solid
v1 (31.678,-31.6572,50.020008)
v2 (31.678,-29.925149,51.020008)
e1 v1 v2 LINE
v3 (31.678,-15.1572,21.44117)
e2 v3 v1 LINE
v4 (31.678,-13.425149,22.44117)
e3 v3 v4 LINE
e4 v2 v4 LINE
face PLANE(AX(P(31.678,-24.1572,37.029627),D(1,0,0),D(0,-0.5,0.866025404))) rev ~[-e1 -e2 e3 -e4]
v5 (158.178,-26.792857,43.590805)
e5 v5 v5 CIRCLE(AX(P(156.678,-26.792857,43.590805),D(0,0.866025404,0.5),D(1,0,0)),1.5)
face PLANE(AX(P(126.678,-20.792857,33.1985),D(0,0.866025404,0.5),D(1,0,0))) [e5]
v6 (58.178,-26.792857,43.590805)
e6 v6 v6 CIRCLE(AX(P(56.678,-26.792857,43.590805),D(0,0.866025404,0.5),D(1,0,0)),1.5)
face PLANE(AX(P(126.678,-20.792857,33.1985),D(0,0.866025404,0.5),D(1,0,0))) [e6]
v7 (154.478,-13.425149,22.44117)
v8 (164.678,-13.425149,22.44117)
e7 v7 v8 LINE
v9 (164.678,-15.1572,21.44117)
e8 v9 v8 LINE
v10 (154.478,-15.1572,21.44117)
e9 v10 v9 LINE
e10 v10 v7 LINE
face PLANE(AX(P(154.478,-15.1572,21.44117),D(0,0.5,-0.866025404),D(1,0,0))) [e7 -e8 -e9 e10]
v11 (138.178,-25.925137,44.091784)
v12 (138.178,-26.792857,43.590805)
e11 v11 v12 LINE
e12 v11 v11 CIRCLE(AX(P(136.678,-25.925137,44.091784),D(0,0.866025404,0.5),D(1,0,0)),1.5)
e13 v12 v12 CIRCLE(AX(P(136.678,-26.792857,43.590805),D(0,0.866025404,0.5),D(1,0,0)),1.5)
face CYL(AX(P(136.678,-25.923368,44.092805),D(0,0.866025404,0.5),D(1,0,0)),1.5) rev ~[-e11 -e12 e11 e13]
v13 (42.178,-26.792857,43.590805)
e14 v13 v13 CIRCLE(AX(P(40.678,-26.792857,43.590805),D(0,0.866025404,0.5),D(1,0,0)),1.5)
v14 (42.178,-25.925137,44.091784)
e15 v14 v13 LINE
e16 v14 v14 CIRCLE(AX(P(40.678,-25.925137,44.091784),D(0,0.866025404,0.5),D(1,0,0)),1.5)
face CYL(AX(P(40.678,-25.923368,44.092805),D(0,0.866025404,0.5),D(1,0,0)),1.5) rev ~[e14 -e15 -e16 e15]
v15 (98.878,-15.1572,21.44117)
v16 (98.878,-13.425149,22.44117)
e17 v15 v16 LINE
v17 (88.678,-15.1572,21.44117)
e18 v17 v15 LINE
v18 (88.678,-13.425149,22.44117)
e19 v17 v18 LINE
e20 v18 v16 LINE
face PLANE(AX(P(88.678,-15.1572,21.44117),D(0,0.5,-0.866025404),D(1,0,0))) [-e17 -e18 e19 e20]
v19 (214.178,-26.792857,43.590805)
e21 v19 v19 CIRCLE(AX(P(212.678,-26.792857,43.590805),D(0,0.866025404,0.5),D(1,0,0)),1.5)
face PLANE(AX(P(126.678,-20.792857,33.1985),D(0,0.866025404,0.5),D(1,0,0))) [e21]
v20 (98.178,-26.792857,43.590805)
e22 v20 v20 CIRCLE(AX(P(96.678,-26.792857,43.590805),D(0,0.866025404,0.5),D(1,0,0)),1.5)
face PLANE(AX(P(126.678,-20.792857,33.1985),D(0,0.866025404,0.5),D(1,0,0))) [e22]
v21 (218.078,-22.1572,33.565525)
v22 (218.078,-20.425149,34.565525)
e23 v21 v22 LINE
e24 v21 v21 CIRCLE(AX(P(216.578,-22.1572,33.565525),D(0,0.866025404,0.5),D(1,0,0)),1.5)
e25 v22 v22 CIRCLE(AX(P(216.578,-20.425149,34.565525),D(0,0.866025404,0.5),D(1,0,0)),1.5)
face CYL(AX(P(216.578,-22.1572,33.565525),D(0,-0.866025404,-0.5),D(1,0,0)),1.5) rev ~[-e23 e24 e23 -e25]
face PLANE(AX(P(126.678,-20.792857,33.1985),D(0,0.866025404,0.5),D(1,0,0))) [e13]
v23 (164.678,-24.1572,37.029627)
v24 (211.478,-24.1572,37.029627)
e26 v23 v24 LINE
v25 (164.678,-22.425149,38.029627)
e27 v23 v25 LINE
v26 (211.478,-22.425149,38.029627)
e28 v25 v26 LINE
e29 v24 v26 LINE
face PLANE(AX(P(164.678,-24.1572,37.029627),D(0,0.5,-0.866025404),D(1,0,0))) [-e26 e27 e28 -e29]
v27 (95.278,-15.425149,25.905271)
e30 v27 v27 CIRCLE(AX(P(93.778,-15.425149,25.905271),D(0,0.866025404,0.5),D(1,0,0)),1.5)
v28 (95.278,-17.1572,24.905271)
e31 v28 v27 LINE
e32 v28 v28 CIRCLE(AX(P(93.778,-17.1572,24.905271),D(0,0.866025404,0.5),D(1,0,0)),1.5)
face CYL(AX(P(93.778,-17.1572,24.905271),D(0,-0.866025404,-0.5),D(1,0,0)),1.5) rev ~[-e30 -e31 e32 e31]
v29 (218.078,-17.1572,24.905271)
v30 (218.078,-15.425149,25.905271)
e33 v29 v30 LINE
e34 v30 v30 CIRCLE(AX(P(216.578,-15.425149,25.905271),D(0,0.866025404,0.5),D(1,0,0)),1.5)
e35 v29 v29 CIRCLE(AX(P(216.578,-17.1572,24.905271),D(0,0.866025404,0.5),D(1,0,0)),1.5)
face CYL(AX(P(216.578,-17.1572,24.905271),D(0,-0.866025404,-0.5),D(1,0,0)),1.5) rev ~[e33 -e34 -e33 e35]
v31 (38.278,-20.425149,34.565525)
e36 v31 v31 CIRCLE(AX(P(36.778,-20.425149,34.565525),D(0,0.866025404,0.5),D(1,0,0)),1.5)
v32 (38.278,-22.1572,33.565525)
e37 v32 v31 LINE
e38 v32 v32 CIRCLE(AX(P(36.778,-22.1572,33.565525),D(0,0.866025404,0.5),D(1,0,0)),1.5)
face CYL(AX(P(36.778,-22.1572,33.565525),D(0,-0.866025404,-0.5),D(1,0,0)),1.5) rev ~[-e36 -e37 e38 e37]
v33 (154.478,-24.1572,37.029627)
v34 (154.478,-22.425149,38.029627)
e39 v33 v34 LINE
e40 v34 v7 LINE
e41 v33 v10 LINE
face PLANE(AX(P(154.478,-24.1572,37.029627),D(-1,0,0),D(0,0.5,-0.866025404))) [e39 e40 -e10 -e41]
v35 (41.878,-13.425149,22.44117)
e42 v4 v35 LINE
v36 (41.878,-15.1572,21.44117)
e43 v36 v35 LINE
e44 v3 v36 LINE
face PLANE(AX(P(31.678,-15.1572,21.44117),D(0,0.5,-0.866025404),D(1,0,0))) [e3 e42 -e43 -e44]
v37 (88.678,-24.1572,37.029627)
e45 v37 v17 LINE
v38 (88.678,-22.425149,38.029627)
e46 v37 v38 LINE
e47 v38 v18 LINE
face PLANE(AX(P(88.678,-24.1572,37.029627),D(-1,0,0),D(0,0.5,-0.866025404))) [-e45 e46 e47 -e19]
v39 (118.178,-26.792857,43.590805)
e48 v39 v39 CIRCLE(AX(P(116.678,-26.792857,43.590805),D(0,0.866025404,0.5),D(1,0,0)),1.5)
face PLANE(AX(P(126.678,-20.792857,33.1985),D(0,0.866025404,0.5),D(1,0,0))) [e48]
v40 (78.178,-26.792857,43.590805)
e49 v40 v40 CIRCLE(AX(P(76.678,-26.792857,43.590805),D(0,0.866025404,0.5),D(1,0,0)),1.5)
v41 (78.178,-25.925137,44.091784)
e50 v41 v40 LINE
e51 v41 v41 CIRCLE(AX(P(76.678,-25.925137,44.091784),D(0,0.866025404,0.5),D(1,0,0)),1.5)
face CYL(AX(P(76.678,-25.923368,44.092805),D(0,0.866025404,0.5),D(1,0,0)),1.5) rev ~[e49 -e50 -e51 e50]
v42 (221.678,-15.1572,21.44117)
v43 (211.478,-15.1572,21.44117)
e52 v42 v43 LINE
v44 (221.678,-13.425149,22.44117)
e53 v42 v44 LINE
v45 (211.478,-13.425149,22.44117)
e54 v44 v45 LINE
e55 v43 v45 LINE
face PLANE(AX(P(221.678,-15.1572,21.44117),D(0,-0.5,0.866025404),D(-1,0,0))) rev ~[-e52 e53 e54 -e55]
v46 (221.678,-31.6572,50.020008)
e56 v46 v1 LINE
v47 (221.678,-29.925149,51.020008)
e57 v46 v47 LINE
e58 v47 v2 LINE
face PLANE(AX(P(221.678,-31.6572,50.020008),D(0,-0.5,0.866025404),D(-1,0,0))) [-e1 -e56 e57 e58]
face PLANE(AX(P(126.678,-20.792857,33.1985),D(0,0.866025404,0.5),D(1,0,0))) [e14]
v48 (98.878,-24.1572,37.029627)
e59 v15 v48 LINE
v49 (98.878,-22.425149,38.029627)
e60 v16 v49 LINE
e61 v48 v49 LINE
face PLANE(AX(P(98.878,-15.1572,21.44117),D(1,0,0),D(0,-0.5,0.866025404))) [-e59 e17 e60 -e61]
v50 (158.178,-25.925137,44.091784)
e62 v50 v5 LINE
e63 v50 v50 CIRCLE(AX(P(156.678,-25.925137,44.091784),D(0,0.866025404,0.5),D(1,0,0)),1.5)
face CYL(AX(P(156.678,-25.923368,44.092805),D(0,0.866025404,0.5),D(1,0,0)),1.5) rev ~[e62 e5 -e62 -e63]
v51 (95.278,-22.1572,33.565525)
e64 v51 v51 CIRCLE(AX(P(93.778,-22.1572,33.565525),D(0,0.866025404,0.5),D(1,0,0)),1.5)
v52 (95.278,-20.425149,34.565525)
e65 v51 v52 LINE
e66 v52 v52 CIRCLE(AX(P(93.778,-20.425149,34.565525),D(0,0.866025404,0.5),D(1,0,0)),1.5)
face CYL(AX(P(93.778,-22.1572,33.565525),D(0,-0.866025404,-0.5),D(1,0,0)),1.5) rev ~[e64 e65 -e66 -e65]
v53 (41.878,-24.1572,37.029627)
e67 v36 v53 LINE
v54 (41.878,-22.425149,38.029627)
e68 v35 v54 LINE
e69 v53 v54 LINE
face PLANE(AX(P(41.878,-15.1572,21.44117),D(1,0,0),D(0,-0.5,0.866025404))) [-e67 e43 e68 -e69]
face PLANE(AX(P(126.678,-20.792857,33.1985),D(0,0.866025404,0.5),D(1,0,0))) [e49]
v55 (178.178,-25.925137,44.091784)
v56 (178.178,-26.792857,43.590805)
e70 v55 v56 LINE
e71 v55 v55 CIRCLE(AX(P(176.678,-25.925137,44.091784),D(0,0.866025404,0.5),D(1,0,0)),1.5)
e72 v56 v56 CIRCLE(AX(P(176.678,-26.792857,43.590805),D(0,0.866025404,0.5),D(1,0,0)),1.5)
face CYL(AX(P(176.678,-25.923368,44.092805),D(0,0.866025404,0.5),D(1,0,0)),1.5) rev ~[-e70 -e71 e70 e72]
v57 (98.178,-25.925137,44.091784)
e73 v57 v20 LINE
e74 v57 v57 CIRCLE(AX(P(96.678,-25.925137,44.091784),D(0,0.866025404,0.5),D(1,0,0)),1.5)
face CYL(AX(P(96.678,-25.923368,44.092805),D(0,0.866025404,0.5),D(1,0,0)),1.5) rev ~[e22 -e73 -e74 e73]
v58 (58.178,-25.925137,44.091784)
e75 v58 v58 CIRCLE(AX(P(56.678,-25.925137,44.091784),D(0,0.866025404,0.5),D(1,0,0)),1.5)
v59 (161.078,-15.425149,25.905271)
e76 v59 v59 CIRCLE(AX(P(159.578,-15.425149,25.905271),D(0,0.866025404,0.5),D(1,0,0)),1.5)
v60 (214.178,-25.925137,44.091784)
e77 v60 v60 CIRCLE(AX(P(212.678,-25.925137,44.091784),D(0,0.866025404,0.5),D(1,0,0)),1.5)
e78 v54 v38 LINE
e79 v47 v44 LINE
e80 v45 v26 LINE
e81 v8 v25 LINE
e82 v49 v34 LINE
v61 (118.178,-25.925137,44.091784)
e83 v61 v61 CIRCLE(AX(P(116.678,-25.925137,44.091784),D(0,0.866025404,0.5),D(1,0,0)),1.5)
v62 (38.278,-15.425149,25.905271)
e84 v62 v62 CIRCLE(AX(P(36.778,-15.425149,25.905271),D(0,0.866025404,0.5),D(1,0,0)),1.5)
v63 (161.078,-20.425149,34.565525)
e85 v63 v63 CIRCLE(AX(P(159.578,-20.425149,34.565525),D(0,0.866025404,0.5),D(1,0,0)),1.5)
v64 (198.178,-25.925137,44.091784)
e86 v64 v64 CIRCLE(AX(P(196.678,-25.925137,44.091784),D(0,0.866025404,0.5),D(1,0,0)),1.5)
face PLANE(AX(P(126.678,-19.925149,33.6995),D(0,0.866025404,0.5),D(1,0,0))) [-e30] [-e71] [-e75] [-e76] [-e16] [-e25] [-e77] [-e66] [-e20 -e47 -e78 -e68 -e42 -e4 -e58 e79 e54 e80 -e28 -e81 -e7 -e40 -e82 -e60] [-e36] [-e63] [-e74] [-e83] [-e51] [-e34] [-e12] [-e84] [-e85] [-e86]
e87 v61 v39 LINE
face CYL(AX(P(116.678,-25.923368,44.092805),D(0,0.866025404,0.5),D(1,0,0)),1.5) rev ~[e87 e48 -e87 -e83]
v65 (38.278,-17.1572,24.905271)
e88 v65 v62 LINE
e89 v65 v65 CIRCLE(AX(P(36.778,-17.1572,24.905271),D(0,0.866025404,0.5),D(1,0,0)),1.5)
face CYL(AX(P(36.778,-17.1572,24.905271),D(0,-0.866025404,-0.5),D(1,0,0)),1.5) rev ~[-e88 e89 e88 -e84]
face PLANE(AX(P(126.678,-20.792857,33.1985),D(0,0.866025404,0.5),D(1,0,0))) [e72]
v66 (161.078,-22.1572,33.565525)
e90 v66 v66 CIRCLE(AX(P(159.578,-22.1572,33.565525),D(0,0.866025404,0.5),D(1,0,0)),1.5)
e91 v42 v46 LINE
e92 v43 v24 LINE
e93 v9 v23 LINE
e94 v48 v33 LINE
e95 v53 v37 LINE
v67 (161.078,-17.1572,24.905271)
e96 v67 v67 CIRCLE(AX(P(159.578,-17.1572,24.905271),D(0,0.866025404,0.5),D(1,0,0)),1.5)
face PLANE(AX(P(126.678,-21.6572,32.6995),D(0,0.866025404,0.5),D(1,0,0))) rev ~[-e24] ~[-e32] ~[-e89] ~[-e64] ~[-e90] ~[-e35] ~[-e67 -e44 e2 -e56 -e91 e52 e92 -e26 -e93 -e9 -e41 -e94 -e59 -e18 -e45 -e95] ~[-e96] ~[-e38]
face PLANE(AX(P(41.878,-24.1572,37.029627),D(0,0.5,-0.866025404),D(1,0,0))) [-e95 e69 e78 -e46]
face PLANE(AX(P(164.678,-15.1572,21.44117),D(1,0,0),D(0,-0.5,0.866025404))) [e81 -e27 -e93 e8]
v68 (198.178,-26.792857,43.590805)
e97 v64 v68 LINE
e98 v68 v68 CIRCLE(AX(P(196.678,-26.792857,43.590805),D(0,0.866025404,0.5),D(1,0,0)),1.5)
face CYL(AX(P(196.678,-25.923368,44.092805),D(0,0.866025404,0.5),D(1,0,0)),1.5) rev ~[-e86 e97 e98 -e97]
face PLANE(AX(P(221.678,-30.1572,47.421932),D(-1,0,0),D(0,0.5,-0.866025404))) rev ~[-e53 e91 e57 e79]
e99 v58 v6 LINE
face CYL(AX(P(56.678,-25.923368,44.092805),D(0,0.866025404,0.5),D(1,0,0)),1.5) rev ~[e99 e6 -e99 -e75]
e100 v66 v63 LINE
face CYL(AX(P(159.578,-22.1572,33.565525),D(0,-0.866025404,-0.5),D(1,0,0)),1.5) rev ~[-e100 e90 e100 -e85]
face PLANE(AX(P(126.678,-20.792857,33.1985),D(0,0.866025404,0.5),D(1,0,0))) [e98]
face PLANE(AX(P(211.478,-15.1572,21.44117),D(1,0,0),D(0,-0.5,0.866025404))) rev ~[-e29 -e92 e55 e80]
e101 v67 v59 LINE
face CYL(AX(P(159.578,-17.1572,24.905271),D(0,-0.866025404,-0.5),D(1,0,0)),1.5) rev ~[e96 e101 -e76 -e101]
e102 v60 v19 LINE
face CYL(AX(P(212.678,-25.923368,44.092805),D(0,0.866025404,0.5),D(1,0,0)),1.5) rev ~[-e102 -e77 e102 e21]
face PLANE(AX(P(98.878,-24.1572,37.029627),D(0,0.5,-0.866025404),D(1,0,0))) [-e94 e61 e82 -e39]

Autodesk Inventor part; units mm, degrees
ref_plane "YZ Plane" through (0, 0, 0) normal (1, 0, 0) x (0, 1, 0)
ref_plane "XZ Plane" through (0, 0, 0) normal (0, 1, 0) x (-1, 0, 0)
ref_plane "작업 평면1" through (126.678, -21.6572, 32.6995) normal (0, 0.8660254, 0.5) x (1, 0, 0)
sketch "스케치1" plane through (126.678, -21.6572, 32.6995) normal (0, 0.8660254, 0.5) x (1, 0, 0)
  circle A0 centre (89.9, 9) radius 1.5 projected
  circle A1 centre (-89.9, -1) radius 1.5 projected
  circle A2 centre (-89.9, 9) radius 1.5 projected
  circle A3 centre (89.9, -1) radius 1.5 projected
  circle A4 centre (32.9, 9) radius 1.5 projected
  circle A5 centre (-32.9, -1) radius 1.5 projected
  circle A6 centre (-32.9, 9) radius 1.5 projected
  circle A7 centre (32.9, -1) radius 1.5 projected
  line L0 (95, -17) -> (95, 17) projected
  line L1 (8, 17) -> (95, 17) projected
  line L2 (8, 17) -> (8, 10) projected
  arc A8 (6, 8) -> (8, 10) centre (6, 10) ccw projected
  line L3 (6, 8) -> (-6, 8) projected
  arc A9 (-8, 10) -> (-6, 8) centre (-6, 10) ccw projected
  line L4 (-8, 10) -> (-8, 17) projected
  line L5 (-95, 17) -> (-8, 17) projected
  line L6 (-95, 17) -> (-95, -17) projected
  line L7 (95, -17) -> (-95, -17) projected
  line L8 (95, 13) -> (95, -20)
  line L9 (95, -20) -> (-95, -20)
  line L10 (-95, -20) -> (-95, 13)
  line L11 (-95, 13) -> (-84.8, 13)
  line L12 (-84.8, 13) -> (-84.8, -5)
  line L13 (-84.8, -5) -> (-95, -5)
  line L14 (-95, -5) -> (-95, 13)
  line L15 (-38, 13) -> (-27.8, 13)
  line L16 (-27.8, 13) -> (-27.8, -5)
  line L17 (-27.8, -5) -> (-38, -5)
  line L18 (-38, -5) -> (-38, 13)
  line L19 (27.8, 13) -> (38, 13)
  line L20 (38, 13) -> (38, -5)
  line L21 (38, -5) -> (27.8, -5)
  line L22 (27.8, -5) -> (27.8, 13)
  line L23 (95, 13) -> (84.8, 13)
  line L24 (84.8, 13) -> (84.8, -5)
  line L25 (84.8, -5) -> (95, -5)
  line L26 (95, -5) -> (95, 13)
  line L27 (-84.8, -5) -> (84.8, -5)
  line L28 (84.8, 13) -> (95, 13)
  line L29 (27.8, 13) -> (38, 13)
  line L30 (-95, 13) -> (-84.8, 13)
  line L31 (-38, 13) -> (-27.8, 13)
  point P0 (-126.678, 39.1472)
  dimension "d1" = 190
  dimension "d2" = 33
  dimension "d5" = 10.2
  dimension "d6" = 18
  dimension "d7" = 10.2
  dimension "d8" = 18
  dimension "d9" = 10.2
  dimension "d10" = 18
  dimension "d11" = 5.1
  dimension "d12" = 18
  dimension "d13" = 10.2
  dimension "d14" = 5.1
extrude "돌출1" add sketch "스케치1" along normal blind 2 contours L7 L6 L13 L27 L17 L21 L25 L0 | L8 L9 L10 L7 | L25 L24 L23 L0 | L6 L11 L12 L13 | L21 L22 L19 L20 | L18 L15 L16 L17
sketch "스케치2" plane through (126.678, -19.9251, 33.6995) normal (0, 0.8660254, 0.5) x (1, 0, 0)
  circle A0 centre (32.9, 9) radius 1.5 projected
  circle A1 centre (32.9, -1) radius 1.5 projected
  circle A2 centre (-89.9, 9) radius 1.5 projected
  circle A3 centre (-89.9, -1) radius 1.5 projected
  circle A4 centre (89.9, 9) radius 1.5 projected
  circle A5 centre (89.9, -1) radius 1.5 projected
  circle A6 centre (-32.9, 9) radius 1.5 projected
  circle A7 centre (-32.9, -1) radius 1.5 projected
  line L0 (-38, 13) -> (-38, -5) projected
  line L1 (-38, -5) -> (-84.8, -5) projected
  line L2 (-84.8, -5) -> (-84.8, 13) projected
  line L3 (-84.8, 13) -> (-95, 13) projected
  line L4 (-95, 13) -> (-95, -20) projected
  line L5 (-95, -20) -> (95, -20) projected
  line L6 (95, -20) -> (95, 13) projected
  line L7 (95, 13) -> (84.8, 13) projected
  line L8 (84.8, 13) -> (84.8, -5) projected
  line L9 (84.8, -5) -> (38, -5) projected
  line L10 (38, -5) -> (38, 13) projected
  line L11 (38, 13) -> (27.8, 13) projected
  line L12 (27.8, 13) -> (27.8, -5) projected
  line L13 (27.8, -5) -> (-27.8, -5) projected
  line L14 (-27.8, -5) -> (-27.8, 13) projected
  line L15 (-27.8, 13) -> (-38, 13) projected
  line L16 (-95, -20) -> (95, -20) projected
  line L17 (-86, -20) -> (-86, -12)
  line L18 (-86, -12) -> (-70, -12)
  line L19 (-70, -12) -> (-50, -12)
  line L20 (-50, -12) -> (-30, -12)
  line L21 (-30, -12) -> (-10, -12)
  line L22 (-10, -12) -> (10, -12)
  line L23 (10, -12) -> (30, -12)
  line L24 (30, -12) -> (50, -12)
  line L25 (50, -12) -> (70, -12)
  line L26 (70, -12) -> (86, -12)
  circle A8 centre (-86, -12) radius 1.5
  circle A9 centre (-70, -12) radius 1.5
  circle A10 centre (-50, -12) radius 1.5
  circle A11 centre (-30, -12) radius 1.5
  circle A12 centre (-10, -12) radius 1.5
  circle A13 centre (10, -12) radius 1.5
  circle A14 centre (30, -12) radius 1.5
  circle A15 centre (50, -12) radius 1.5
  circle A16 centre (70, -12) radius 1.5
  circle A17 centre (86, -12) radius 1.5
  point P0 (-126.678, 39.1472)
  dimension "d17" = 8
  dimension "d18" = 16
  dimension "d19" = 20
  dimension "d20" = 20
  dimension "d21" = 20
  dimension "d22" = 20
  dimension "d23" = 20
  dimension "d24" = 20
  dimension "d25" = 20
  dimension "d26" = 16
  dimension "d27" = 9
  dimension "d28" = 3
  dimension "d29" = 3
  dimension "d30" = 3
  dimension "d31" = 3
  dimension "d32" = 3
  dimension "d33" = 3
  dimension "d34" = 3
  dimension "d35" = 3
  dimension "d36" = 3
  dimension "d38" = 3
extrude "돌출2" cut sketch "스케치2" against normal blind 1 contours A8 L18 L17 | L17 L18 A8 | A9 L19 L18 | L18 L19 A9 | A10 L20 L19 | L19 L20 A10 | A11 L21 L20 | L20 L21 A11 | A12 L22 L21 | L21 L22 A12 | A13 L23 L22 | L22 L23 A13 | A14 L24 L23 | L23 L24 A14 | A15 L25 L24 | L24 L25 A15 | A16 L26 L25 | L25 L26 A16 | A17
properties part number "칼팁" material "철, 주조"
